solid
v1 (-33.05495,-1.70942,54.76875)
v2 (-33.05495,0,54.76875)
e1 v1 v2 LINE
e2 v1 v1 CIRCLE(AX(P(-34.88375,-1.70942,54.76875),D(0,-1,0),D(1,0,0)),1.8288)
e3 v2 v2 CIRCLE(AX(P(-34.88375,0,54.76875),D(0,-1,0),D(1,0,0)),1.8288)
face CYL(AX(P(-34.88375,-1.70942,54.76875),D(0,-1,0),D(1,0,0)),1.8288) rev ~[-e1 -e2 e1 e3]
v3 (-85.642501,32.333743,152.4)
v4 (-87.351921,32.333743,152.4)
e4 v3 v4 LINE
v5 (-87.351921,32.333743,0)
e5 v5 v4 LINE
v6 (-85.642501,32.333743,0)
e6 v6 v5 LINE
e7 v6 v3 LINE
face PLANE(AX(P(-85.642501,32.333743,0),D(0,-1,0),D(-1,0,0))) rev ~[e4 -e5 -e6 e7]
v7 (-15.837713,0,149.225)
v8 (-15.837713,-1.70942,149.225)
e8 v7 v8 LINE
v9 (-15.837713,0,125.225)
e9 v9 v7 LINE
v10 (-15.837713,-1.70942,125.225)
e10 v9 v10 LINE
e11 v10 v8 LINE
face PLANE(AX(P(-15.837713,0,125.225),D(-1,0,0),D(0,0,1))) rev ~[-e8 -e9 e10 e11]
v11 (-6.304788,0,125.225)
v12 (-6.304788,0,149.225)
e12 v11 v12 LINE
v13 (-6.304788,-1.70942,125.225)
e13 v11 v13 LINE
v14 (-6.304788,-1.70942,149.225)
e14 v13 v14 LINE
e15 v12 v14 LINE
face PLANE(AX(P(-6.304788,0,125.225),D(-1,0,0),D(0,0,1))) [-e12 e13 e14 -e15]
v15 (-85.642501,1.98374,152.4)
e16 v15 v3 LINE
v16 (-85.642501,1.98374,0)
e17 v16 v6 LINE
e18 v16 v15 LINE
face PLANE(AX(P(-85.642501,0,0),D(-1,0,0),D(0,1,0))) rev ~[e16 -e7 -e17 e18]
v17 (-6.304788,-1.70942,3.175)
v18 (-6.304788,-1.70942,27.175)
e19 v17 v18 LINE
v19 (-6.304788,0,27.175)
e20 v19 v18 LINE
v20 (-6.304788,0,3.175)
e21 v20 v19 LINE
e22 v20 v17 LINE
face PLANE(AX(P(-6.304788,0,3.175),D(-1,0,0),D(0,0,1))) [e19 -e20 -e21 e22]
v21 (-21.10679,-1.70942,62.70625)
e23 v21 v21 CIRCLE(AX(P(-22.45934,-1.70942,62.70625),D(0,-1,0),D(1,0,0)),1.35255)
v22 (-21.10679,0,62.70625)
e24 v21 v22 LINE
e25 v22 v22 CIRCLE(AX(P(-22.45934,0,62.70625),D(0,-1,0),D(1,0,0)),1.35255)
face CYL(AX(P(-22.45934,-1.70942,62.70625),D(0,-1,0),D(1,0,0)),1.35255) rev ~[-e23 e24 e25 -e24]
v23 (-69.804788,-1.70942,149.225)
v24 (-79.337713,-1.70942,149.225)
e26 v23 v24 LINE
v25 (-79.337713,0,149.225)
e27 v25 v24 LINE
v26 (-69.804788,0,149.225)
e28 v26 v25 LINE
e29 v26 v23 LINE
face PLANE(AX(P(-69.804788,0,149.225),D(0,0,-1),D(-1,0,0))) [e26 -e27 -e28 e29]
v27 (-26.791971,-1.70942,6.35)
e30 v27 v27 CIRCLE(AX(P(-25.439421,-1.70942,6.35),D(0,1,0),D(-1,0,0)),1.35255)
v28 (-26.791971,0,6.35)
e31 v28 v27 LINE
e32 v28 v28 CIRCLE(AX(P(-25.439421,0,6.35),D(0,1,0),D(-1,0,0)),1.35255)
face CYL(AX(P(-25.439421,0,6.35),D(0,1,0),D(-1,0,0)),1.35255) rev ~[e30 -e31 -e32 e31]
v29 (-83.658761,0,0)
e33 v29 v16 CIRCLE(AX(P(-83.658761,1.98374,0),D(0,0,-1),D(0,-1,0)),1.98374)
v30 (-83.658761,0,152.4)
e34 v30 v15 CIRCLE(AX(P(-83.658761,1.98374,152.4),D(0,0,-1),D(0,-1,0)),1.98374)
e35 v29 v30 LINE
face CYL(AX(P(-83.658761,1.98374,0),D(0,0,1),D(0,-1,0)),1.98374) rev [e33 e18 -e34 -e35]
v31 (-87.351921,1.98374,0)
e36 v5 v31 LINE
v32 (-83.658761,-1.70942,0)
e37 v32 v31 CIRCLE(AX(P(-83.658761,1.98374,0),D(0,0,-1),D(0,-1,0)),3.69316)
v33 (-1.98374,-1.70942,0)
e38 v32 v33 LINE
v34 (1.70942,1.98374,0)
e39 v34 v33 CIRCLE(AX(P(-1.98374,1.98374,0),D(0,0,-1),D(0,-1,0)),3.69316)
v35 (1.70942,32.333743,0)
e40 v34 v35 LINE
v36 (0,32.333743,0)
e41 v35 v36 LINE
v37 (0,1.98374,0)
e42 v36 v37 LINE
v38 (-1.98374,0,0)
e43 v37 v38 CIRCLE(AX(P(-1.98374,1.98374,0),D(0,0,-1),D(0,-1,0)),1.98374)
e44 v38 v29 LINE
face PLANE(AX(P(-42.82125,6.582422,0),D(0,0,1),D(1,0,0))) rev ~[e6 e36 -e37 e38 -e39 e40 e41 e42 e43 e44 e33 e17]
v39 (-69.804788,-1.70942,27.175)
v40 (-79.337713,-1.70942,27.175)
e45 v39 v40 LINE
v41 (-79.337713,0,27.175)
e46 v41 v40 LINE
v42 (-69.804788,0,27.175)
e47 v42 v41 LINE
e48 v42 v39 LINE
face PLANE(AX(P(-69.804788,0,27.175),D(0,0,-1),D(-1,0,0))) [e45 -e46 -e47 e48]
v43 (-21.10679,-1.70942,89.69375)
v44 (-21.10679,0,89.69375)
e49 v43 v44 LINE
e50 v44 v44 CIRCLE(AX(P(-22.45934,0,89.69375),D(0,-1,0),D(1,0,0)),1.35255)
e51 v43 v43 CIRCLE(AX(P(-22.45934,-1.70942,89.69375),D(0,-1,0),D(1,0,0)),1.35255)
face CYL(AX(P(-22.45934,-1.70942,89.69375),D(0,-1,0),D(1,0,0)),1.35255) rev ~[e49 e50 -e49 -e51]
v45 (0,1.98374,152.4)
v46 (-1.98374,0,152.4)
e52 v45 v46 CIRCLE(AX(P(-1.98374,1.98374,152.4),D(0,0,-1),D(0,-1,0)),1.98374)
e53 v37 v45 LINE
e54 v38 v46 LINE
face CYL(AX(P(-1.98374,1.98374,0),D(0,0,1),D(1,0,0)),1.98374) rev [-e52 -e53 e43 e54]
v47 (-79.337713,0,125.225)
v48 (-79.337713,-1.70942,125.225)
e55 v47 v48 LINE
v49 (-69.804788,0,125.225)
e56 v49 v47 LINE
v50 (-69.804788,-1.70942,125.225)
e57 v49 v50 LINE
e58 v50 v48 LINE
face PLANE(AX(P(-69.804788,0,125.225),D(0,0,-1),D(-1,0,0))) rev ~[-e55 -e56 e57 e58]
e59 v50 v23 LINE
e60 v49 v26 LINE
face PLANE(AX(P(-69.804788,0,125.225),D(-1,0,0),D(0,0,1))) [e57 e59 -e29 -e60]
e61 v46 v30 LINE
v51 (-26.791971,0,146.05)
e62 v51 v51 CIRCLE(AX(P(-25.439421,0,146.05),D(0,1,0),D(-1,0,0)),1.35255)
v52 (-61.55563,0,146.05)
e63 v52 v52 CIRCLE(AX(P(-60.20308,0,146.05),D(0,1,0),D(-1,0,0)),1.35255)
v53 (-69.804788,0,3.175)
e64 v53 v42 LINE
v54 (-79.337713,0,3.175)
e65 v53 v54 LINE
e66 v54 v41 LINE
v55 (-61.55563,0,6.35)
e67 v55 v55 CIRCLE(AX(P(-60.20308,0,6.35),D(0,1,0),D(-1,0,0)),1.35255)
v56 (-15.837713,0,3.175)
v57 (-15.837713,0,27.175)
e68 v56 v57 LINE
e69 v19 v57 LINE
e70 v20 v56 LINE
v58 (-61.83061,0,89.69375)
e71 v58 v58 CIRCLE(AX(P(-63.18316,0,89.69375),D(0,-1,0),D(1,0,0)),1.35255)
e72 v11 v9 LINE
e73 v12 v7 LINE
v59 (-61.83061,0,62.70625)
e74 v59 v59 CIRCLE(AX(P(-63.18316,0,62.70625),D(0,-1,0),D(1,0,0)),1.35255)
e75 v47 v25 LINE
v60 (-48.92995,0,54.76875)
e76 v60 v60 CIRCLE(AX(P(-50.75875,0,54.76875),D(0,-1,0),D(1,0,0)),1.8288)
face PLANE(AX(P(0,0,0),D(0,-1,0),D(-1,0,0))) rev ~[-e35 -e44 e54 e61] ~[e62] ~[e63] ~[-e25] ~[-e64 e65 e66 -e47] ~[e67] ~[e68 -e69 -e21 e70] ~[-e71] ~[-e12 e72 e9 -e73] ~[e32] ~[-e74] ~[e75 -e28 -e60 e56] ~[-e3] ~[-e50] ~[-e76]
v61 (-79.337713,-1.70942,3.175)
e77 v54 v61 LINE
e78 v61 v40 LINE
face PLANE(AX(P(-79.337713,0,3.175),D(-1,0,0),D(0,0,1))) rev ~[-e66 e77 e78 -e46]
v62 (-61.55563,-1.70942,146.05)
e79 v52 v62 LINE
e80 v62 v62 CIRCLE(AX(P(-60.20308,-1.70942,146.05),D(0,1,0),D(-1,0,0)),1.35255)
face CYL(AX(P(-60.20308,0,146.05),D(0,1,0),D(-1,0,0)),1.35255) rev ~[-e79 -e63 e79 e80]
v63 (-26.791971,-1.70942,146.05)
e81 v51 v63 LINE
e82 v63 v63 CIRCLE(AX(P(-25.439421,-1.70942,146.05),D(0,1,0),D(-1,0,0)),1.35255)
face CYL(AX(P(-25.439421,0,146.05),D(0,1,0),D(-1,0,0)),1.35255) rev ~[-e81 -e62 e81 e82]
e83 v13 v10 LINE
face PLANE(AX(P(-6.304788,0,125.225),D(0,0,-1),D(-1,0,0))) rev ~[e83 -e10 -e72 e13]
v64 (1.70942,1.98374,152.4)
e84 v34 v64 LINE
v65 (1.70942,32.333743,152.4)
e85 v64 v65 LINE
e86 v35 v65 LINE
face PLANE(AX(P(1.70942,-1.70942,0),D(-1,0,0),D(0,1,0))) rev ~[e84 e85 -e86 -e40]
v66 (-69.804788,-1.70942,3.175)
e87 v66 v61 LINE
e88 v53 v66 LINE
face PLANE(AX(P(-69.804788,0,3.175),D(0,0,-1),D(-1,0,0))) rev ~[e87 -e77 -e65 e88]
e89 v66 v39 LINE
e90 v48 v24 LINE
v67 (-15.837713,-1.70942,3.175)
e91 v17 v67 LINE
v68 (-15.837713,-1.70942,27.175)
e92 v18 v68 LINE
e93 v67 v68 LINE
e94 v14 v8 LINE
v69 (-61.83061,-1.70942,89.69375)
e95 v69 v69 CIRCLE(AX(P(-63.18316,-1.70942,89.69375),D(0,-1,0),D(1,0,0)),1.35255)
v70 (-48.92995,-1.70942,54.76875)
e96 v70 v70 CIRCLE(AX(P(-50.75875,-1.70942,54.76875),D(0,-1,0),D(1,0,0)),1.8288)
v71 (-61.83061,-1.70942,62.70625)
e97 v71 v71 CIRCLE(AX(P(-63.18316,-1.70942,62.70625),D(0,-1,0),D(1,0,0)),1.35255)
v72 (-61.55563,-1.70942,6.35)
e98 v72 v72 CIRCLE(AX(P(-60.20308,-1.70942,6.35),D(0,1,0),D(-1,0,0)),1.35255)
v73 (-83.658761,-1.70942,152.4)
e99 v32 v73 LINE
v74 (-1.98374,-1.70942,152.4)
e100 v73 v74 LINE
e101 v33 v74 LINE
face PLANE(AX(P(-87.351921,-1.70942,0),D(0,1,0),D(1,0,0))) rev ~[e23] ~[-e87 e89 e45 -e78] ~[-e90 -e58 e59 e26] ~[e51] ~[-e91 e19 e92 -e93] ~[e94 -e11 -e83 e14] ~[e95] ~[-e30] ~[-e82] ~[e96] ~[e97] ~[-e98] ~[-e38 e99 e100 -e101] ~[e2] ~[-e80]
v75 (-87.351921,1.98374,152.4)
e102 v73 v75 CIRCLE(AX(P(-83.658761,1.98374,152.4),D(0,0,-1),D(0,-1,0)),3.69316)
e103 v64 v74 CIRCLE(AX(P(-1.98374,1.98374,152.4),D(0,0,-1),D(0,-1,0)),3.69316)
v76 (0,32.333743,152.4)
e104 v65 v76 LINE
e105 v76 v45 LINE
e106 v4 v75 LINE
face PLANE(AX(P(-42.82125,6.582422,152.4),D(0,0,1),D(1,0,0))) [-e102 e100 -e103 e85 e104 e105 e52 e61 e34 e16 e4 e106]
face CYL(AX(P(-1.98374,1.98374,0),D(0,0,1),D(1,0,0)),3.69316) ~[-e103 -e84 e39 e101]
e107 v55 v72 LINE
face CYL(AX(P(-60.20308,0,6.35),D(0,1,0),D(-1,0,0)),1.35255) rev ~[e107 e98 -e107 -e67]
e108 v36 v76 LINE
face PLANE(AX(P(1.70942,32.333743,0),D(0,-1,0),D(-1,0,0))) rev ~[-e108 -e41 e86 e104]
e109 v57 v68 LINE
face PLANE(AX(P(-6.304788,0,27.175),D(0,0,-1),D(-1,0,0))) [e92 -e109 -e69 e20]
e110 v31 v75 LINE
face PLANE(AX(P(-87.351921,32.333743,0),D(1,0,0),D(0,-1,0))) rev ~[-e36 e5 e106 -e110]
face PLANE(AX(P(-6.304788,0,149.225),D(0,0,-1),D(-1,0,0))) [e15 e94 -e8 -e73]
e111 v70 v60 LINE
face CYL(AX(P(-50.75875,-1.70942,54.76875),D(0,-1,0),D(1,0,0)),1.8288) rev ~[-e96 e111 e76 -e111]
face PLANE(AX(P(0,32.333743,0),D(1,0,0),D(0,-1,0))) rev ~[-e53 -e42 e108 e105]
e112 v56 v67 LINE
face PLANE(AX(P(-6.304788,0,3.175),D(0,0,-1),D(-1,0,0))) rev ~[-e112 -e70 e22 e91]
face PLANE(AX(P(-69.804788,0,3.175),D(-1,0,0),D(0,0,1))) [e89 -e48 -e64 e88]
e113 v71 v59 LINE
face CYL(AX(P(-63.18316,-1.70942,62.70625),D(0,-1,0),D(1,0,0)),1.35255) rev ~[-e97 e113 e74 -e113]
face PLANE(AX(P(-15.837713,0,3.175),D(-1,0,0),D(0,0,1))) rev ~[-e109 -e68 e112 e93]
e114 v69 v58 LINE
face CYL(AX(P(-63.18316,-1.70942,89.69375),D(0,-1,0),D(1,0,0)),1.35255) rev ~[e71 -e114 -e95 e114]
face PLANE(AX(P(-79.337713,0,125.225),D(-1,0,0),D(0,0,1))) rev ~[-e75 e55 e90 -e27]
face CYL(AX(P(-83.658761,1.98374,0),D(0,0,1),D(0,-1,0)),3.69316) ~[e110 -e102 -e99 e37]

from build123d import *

# Parameters (mm, degrees)
F1_DEPTH = 152.4
F2_R     = 1.98374
F3_R     = 3.69316
F4_W     = 9.5329248
F4_H     = 24
F4_R     = 1.35255
F5_DEPTH = 1.70942
F6_R     = 1.35255
F6_R_2   = 1.8288
F7_DEPTH = 1.70942


with BuildPart() as f1:
    # F0 (on Top) → F1 (new body)
    with BuildSketch(Plane.XY):
        Polygon((0, 32.3337428), (0, 0), (-85.6425008, 0), (-85.6425008, 32.3337428), (-87.3519208, 32.3337428), (-87.3519208, -1.70942), (1.70942, -1.70942), (1.70942, 32.3337428), align=None)
    extrude(amount=F1_DEPTH)

    # F2
    f2_edges = [f1.edges().sort_by_distance(p)[0] for p in [
        (0, 0, 76.2),
        (-85.642501, 0, 76.2),
    ]]
    fillet(f2_edges, radius=F2_R)

    # F3
    f3_edges = [f1.edges().sort_by_distance(p)[0] for p in [
        (1.70942, -1.70942, 76.2),
        (-87.351921, -1.70942, 76.2),
    ]]
    fillet(f3_edges, radius=F3_R)

    # F4 (on face) → F5 (cut, through all)
    with BuildSketch(Plane(origin=(0, 0, 0), x_dir=(-1, 0, 0), z_dir=(0, 1, 0))):
        with Locations((74.5712504, 15.175)):
            Rectangle(F4_W, F4_H)
        with Locations((11.0712504, 15.175)):
            Rectangle(F4_W, F4_H)
        with Locations((11.0712504, 137.225)):
            Rectangle(F4_W, F4_H)
        with Locations((74.5712504, 137.225)):
            Rectangle(F4_W, F4_H)
        with Locations((60.20308, 6.35)):
            Circle(F4_R)
        with Locations((25.4394208, 6.35)):
            Circle(F4_R)
        with Locations((25.4394208, 146.05)):
            Circle(F4_R)
        with Locations((60.20308, 146.05)):
            Circle(F4_R)
    extrude(amount=-F5_DEPTH, mode=Mode.SUBTRACT)

    # F6 (on face) → F7 (cut, through all)
    with BuildSketch(Plane.XZ.offset(1.70942)):
        with Locations((-63.1831604, 89.69375)):
            Circle(F6_R)
        with Locations((-22.4593404, 89.69375)):
            Circle(F6_R)
        with Locations((-22.4593404, 62.70625)):
            Circle(F6_R)
        with Locations((-63.1831604, 62.70625)):
            Circle(F6_R)
        with Locations((-50.7587504, 54.76875)):
            Circle(F6_R_2)
        with Locations((-34.8837504, 54.76875)):
            Circle(F6_R_2)
    extrude(amount=-F7_DEPTH, mode=Mode.SUBTRACT)


solid = f1.part
